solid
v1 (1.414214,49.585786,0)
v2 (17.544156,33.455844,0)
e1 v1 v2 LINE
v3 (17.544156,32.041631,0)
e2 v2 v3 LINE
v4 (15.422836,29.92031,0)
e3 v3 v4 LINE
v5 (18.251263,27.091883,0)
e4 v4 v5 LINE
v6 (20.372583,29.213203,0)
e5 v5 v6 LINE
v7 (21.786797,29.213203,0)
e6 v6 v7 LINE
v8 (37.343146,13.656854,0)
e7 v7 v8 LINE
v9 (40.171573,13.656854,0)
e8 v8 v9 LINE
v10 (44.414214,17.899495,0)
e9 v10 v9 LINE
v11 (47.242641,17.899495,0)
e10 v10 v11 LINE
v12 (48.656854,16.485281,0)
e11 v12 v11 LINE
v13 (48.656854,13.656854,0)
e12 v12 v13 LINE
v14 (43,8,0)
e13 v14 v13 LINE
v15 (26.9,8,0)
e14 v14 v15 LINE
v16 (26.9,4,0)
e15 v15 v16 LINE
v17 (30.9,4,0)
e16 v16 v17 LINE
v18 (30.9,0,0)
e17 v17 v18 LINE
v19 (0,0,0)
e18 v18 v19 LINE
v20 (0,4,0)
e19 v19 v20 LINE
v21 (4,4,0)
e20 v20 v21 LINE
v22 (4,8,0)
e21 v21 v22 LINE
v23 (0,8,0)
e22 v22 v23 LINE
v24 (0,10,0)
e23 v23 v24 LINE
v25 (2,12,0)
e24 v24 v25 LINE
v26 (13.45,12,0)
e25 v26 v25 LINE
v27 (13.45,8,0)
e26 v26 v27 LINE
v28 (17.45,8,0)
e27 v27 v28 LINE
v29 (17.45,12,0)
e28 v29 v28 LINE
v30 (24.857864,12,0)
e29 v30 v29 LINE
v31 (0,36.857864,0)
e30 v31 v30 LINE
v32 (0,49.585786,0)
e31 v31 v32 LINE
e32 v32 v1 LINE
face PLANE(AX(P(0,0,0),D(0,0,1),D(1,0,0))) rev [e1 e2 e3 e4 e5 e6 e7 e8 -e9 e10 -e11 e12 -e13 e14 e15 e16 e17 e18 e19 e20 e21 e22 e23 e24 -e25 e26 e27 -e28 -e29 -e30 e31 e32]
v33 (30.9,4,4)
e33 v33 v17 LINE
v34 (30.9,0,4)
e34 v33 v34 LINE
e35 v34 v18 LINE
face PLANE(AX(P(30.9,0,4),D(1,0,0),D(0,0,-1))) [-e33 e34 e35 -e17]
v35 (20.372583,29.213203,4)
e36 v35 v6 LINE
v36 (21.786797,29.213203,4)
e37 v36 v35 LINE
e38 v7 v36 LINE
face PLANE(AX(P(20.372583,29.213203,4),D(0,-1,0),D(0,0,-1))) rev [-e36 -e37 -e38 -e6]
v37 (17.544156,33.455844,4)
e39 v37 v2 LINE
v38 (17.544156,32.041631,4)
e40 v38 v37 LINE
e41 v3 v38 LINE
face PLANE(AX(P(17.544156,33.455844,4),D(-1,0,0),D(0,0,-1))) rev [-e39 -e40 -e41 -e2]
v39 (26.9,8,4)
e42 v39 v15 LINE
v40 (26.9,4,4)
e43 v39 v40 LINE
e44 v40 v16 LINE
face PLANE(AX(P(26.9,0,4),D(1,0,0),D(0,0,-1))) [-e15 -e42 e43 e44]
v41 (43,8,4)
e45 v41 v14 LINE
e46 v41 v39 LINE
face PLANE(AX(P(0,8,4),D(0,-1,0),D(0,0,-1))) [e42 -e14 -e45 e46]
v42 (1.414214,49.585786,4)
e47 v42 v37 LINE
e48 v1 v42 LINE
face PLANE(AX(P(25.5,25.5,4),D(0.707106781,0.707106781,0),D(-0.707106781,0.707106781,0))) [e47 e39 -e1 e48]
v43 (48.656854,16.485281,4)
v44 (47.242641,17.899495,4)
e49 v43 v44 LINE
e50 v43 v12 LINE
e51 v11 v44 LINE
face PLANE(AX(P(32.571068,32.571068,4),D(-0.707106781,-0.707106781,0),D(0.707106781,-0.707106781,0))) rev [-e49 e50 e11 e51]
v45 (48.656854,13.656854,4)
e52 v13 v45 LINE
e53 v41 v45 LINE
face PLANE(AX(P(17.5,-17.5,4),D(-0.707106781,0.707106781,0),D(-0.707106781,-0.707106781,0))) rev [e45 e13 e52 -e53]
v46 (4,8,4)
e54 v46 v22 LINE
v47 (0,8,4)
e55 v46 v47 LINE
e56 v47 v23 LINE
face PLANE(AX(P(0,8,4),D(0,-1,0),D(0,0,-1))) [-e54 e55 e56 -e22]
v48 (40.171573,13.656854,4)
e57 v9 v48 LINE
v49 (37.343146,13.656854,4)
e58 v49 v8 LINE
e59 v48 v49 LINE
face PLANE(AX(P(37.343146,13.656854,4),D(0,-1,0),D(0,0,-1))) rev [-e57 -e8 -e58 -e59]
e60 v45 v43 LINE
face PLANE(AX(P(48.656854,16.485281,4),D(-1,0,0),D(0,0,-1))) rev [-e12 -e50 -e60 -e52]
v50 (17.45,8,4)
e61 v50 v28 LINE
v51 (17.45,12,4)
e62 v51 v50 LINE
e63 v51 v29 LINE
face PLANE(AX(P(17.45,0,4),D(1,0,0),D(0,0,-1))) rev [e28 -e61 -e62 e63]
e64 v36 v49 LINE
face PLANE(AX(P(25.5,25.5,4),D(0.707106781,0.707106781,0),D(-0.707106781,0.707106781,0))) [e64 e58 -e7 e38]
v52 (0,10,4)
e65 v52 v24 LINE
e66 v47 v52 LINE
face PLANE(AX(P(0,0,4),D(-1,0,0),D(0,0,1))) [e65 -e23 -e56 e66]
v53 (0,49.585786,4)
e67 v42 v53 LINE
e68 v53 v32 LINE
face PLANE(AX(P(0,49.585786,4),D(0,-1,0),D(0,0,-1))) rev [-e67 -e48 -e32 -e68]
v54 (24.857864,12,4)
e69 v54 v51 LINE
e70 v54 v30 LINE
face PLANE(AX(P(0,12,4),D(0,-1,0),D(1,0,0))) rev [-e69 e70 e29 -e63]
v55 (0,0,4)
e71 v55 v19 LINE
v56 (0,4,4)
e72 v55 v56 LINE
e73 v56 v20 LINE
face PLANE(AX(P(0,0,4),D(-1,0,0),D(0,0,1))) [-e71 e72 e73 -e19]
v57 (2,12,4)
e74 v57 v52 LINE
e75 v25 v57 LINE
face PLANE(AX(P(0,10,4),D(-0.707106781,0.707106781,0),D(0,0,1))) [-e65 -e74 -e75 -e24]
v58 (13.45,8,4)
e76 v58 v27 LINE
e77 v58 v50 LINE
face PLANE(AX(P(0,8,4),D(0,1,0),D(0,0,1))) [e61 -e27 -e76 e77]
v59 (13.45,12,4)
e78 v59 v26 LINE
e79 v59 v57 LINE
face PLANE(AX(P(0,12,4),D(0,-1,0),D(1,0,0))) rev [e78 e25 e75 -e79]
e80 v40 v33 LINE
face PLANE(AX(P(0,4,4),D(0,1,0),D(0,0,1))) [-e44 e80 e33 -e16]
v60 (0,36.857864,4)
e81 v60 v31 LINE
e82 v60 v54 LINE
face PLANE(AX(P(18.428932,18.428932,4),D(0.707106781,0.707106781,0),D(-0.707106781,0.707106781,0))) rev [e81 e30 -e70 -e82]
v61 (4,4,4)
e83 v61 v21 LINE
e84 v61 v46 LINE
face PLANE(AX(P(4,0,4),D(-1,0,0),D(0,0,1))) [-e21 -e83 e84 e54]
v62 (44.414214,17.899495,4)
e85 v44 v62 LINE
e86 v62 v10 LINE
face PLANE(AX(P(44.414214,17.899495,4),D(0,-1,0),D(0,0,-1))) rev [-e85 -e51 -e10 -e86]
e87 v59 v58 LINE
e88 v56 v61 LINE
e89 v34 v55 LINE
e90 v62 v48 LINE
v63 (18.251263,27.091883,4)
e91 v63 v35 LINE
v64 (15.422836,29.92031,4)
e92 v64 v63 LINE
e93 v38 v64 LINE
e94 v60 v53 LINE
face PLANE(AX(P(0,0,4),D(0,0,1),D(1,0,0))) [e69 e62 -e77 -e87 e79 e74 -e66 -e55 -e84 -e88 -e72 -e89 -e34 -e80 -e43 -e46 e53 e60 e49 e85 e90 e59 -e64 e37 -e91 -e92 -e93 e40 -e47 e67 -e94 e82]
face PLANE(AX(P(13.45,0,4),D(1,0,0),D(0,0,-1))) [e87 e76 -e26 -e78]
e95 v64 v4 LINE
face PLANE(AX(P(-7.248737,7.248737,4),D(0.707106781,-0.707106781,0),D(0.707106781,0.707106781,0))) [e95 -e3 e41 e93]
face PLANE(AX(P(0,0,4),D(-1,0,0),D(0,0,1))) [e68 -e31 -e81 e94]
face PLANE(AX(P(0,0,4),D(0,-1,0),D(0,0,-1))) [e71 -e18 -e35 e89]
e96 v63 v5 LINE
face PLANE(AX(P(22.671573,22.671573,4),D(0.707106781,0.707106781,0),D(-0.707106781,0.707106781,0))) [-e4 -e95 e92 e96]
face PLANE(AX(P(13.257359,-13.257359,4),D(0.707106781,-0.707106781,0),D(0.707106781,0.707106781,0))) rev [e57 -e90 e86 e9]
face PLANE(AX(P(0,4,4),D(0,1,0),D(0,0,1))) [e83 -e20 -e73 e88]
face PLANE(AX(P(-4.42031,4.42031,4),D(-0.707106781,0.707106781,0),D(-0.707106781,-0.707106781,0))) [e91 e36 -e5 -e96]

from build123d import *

# Parameters (mm, degrees)
BOSS_EXTRUDE1_DEPTH = 4
CHAMFER1_SIZE       = 2
CHAMFER1_SIZE_2     = 1.414213562
CHAMFER2_SIZE       = 1


with BuildPart() as part:
    # Sketch1 → Boss-Extrude1 (new body)
    with BuildSketch(Plane.XY):
        Polygon((0, 4), (0, 0), (30.9, 0), (30.9, 4), (26.9, 4), (26.9, 8), (43, 8), (38.757359313, 12.242640687), (21.079689783, 29.920310217), (18.251262658, 27.091883092), (15.422835534, 29.920310217), (18.251262658, 32.748737342), (0, 51), (0, 36.857864376), (24.857864376, 12), (20.857864376, 12), (17.45, 12), (17.45, 8), (13.45, 8), (13.45, 12), (0, 12), (0, 8), (4, 8), (4, 4), align=None)
        Polygon((38.757359313, 12.242640687), (43, 8), (50.071067812, 15.071067812), (45.828427125, 19.313708499), align=None)
    extrude(amount=BOSS_EXTRUDE1_DEPTH)

    # Chamfer1
    # the kernel refuses this chamfer: 2, 1.414213562 mm, written as the material it adds along each edge
    with BuildSketch(Plane(origin=(38.757359313, 12.242640687, 0), x_dir=(-0.7262819568766827, 0.6873969152646646, 0), z_dir=(0, 0, 1))) as chamfer1_piece_1:
        Polygon((CHAMFER1_SIZE * 0.999621916911, -CHAMFER1_SIZE * 0.0274958766106), (-CHAMFER1_SIZE * 0.0274958766106, -CHAMFER1_SIZE * 0.999621916911), (0, 0), align=None)
    extrude(amount=4)
    # the kernel refuses this chamfer: 2, 1.414213562 mm, written as the material it takes off along each edge
    with BuildSketch(Plane(origin=(0, 51, -5.143365976), x_dir=(0.7262819568766843, -0.6873969152646628, 0), z_dir=(0, 0, 1))) as chamfer1_2_piece_1:
        Polygon((CHAMFER1_SIZE * 0.999621916911, -CHAMFER1_SIZE * 0.0274958766106), (CHAMFER1_SIZE_2 * 0.687396915446, -CHAMFER1_SIZE_2 * 0.726281957068), (0, 0), align=None)
    extrude(amount=14.286731952, mode=Mode.SUBTRACT)
    with BuildSketch(Plane(origin=(45.828427125, 19.313708499, -5.143365976), x_dir=(0.7262819568766831, -0.6873969152646641, 0), z_dir=(0, 0, 1)), Plane(origin=(50.071067812, 15.071067812, -5.143365976), x_dir=(-0.6873969152646642, -0.726281956876683, 0), z_dir=(0, 0, 1))) as chamfer1_2_piece_2:
        Polygon((CHAMFER1_SIZE * 0.999621916911, -CHAMFER1_SIZE * 0.0274958766106), (-CHAMFER1_SIZE * 0.0274958766106, -CHAMFER1_SIZE * 0.999621916911), (0, 0), align=None)
    extrude(amount=14.286731952, mode=Mode.SUBTRACT)
    with BuildSketch(Plane(origin=(0, 12, -5.143365976), x_dir=(-0.027495876610586365, -0.9996219169112968, 0), z_dir=(0, 0, 1))) as chamfer1_2_piece_3:
        Polygon((CHAMFER1_SIZE * 0.999621916911, CHAMFER1_SIZE * 0.0274958766106), (-CHAMFER1_SIZE * 0.0274958766106, CHAMFER1_SIZE * 0.999621916911), (0, 0), align=None)
    extrude(amount=14.286731952, mode=Mode.SUBTRACT)

    # Chamfer2
    chamfer2_edges = [part.edges().sort_by_distance(p)[0] for p in [
        (18.251262658, 32.748737342, 2),
        (21.079689783, 29.920310217, 2),
    ]]
    chamfer(chamfer2_edges, length=CHAMFER2_SIZE)


solid = part.part
